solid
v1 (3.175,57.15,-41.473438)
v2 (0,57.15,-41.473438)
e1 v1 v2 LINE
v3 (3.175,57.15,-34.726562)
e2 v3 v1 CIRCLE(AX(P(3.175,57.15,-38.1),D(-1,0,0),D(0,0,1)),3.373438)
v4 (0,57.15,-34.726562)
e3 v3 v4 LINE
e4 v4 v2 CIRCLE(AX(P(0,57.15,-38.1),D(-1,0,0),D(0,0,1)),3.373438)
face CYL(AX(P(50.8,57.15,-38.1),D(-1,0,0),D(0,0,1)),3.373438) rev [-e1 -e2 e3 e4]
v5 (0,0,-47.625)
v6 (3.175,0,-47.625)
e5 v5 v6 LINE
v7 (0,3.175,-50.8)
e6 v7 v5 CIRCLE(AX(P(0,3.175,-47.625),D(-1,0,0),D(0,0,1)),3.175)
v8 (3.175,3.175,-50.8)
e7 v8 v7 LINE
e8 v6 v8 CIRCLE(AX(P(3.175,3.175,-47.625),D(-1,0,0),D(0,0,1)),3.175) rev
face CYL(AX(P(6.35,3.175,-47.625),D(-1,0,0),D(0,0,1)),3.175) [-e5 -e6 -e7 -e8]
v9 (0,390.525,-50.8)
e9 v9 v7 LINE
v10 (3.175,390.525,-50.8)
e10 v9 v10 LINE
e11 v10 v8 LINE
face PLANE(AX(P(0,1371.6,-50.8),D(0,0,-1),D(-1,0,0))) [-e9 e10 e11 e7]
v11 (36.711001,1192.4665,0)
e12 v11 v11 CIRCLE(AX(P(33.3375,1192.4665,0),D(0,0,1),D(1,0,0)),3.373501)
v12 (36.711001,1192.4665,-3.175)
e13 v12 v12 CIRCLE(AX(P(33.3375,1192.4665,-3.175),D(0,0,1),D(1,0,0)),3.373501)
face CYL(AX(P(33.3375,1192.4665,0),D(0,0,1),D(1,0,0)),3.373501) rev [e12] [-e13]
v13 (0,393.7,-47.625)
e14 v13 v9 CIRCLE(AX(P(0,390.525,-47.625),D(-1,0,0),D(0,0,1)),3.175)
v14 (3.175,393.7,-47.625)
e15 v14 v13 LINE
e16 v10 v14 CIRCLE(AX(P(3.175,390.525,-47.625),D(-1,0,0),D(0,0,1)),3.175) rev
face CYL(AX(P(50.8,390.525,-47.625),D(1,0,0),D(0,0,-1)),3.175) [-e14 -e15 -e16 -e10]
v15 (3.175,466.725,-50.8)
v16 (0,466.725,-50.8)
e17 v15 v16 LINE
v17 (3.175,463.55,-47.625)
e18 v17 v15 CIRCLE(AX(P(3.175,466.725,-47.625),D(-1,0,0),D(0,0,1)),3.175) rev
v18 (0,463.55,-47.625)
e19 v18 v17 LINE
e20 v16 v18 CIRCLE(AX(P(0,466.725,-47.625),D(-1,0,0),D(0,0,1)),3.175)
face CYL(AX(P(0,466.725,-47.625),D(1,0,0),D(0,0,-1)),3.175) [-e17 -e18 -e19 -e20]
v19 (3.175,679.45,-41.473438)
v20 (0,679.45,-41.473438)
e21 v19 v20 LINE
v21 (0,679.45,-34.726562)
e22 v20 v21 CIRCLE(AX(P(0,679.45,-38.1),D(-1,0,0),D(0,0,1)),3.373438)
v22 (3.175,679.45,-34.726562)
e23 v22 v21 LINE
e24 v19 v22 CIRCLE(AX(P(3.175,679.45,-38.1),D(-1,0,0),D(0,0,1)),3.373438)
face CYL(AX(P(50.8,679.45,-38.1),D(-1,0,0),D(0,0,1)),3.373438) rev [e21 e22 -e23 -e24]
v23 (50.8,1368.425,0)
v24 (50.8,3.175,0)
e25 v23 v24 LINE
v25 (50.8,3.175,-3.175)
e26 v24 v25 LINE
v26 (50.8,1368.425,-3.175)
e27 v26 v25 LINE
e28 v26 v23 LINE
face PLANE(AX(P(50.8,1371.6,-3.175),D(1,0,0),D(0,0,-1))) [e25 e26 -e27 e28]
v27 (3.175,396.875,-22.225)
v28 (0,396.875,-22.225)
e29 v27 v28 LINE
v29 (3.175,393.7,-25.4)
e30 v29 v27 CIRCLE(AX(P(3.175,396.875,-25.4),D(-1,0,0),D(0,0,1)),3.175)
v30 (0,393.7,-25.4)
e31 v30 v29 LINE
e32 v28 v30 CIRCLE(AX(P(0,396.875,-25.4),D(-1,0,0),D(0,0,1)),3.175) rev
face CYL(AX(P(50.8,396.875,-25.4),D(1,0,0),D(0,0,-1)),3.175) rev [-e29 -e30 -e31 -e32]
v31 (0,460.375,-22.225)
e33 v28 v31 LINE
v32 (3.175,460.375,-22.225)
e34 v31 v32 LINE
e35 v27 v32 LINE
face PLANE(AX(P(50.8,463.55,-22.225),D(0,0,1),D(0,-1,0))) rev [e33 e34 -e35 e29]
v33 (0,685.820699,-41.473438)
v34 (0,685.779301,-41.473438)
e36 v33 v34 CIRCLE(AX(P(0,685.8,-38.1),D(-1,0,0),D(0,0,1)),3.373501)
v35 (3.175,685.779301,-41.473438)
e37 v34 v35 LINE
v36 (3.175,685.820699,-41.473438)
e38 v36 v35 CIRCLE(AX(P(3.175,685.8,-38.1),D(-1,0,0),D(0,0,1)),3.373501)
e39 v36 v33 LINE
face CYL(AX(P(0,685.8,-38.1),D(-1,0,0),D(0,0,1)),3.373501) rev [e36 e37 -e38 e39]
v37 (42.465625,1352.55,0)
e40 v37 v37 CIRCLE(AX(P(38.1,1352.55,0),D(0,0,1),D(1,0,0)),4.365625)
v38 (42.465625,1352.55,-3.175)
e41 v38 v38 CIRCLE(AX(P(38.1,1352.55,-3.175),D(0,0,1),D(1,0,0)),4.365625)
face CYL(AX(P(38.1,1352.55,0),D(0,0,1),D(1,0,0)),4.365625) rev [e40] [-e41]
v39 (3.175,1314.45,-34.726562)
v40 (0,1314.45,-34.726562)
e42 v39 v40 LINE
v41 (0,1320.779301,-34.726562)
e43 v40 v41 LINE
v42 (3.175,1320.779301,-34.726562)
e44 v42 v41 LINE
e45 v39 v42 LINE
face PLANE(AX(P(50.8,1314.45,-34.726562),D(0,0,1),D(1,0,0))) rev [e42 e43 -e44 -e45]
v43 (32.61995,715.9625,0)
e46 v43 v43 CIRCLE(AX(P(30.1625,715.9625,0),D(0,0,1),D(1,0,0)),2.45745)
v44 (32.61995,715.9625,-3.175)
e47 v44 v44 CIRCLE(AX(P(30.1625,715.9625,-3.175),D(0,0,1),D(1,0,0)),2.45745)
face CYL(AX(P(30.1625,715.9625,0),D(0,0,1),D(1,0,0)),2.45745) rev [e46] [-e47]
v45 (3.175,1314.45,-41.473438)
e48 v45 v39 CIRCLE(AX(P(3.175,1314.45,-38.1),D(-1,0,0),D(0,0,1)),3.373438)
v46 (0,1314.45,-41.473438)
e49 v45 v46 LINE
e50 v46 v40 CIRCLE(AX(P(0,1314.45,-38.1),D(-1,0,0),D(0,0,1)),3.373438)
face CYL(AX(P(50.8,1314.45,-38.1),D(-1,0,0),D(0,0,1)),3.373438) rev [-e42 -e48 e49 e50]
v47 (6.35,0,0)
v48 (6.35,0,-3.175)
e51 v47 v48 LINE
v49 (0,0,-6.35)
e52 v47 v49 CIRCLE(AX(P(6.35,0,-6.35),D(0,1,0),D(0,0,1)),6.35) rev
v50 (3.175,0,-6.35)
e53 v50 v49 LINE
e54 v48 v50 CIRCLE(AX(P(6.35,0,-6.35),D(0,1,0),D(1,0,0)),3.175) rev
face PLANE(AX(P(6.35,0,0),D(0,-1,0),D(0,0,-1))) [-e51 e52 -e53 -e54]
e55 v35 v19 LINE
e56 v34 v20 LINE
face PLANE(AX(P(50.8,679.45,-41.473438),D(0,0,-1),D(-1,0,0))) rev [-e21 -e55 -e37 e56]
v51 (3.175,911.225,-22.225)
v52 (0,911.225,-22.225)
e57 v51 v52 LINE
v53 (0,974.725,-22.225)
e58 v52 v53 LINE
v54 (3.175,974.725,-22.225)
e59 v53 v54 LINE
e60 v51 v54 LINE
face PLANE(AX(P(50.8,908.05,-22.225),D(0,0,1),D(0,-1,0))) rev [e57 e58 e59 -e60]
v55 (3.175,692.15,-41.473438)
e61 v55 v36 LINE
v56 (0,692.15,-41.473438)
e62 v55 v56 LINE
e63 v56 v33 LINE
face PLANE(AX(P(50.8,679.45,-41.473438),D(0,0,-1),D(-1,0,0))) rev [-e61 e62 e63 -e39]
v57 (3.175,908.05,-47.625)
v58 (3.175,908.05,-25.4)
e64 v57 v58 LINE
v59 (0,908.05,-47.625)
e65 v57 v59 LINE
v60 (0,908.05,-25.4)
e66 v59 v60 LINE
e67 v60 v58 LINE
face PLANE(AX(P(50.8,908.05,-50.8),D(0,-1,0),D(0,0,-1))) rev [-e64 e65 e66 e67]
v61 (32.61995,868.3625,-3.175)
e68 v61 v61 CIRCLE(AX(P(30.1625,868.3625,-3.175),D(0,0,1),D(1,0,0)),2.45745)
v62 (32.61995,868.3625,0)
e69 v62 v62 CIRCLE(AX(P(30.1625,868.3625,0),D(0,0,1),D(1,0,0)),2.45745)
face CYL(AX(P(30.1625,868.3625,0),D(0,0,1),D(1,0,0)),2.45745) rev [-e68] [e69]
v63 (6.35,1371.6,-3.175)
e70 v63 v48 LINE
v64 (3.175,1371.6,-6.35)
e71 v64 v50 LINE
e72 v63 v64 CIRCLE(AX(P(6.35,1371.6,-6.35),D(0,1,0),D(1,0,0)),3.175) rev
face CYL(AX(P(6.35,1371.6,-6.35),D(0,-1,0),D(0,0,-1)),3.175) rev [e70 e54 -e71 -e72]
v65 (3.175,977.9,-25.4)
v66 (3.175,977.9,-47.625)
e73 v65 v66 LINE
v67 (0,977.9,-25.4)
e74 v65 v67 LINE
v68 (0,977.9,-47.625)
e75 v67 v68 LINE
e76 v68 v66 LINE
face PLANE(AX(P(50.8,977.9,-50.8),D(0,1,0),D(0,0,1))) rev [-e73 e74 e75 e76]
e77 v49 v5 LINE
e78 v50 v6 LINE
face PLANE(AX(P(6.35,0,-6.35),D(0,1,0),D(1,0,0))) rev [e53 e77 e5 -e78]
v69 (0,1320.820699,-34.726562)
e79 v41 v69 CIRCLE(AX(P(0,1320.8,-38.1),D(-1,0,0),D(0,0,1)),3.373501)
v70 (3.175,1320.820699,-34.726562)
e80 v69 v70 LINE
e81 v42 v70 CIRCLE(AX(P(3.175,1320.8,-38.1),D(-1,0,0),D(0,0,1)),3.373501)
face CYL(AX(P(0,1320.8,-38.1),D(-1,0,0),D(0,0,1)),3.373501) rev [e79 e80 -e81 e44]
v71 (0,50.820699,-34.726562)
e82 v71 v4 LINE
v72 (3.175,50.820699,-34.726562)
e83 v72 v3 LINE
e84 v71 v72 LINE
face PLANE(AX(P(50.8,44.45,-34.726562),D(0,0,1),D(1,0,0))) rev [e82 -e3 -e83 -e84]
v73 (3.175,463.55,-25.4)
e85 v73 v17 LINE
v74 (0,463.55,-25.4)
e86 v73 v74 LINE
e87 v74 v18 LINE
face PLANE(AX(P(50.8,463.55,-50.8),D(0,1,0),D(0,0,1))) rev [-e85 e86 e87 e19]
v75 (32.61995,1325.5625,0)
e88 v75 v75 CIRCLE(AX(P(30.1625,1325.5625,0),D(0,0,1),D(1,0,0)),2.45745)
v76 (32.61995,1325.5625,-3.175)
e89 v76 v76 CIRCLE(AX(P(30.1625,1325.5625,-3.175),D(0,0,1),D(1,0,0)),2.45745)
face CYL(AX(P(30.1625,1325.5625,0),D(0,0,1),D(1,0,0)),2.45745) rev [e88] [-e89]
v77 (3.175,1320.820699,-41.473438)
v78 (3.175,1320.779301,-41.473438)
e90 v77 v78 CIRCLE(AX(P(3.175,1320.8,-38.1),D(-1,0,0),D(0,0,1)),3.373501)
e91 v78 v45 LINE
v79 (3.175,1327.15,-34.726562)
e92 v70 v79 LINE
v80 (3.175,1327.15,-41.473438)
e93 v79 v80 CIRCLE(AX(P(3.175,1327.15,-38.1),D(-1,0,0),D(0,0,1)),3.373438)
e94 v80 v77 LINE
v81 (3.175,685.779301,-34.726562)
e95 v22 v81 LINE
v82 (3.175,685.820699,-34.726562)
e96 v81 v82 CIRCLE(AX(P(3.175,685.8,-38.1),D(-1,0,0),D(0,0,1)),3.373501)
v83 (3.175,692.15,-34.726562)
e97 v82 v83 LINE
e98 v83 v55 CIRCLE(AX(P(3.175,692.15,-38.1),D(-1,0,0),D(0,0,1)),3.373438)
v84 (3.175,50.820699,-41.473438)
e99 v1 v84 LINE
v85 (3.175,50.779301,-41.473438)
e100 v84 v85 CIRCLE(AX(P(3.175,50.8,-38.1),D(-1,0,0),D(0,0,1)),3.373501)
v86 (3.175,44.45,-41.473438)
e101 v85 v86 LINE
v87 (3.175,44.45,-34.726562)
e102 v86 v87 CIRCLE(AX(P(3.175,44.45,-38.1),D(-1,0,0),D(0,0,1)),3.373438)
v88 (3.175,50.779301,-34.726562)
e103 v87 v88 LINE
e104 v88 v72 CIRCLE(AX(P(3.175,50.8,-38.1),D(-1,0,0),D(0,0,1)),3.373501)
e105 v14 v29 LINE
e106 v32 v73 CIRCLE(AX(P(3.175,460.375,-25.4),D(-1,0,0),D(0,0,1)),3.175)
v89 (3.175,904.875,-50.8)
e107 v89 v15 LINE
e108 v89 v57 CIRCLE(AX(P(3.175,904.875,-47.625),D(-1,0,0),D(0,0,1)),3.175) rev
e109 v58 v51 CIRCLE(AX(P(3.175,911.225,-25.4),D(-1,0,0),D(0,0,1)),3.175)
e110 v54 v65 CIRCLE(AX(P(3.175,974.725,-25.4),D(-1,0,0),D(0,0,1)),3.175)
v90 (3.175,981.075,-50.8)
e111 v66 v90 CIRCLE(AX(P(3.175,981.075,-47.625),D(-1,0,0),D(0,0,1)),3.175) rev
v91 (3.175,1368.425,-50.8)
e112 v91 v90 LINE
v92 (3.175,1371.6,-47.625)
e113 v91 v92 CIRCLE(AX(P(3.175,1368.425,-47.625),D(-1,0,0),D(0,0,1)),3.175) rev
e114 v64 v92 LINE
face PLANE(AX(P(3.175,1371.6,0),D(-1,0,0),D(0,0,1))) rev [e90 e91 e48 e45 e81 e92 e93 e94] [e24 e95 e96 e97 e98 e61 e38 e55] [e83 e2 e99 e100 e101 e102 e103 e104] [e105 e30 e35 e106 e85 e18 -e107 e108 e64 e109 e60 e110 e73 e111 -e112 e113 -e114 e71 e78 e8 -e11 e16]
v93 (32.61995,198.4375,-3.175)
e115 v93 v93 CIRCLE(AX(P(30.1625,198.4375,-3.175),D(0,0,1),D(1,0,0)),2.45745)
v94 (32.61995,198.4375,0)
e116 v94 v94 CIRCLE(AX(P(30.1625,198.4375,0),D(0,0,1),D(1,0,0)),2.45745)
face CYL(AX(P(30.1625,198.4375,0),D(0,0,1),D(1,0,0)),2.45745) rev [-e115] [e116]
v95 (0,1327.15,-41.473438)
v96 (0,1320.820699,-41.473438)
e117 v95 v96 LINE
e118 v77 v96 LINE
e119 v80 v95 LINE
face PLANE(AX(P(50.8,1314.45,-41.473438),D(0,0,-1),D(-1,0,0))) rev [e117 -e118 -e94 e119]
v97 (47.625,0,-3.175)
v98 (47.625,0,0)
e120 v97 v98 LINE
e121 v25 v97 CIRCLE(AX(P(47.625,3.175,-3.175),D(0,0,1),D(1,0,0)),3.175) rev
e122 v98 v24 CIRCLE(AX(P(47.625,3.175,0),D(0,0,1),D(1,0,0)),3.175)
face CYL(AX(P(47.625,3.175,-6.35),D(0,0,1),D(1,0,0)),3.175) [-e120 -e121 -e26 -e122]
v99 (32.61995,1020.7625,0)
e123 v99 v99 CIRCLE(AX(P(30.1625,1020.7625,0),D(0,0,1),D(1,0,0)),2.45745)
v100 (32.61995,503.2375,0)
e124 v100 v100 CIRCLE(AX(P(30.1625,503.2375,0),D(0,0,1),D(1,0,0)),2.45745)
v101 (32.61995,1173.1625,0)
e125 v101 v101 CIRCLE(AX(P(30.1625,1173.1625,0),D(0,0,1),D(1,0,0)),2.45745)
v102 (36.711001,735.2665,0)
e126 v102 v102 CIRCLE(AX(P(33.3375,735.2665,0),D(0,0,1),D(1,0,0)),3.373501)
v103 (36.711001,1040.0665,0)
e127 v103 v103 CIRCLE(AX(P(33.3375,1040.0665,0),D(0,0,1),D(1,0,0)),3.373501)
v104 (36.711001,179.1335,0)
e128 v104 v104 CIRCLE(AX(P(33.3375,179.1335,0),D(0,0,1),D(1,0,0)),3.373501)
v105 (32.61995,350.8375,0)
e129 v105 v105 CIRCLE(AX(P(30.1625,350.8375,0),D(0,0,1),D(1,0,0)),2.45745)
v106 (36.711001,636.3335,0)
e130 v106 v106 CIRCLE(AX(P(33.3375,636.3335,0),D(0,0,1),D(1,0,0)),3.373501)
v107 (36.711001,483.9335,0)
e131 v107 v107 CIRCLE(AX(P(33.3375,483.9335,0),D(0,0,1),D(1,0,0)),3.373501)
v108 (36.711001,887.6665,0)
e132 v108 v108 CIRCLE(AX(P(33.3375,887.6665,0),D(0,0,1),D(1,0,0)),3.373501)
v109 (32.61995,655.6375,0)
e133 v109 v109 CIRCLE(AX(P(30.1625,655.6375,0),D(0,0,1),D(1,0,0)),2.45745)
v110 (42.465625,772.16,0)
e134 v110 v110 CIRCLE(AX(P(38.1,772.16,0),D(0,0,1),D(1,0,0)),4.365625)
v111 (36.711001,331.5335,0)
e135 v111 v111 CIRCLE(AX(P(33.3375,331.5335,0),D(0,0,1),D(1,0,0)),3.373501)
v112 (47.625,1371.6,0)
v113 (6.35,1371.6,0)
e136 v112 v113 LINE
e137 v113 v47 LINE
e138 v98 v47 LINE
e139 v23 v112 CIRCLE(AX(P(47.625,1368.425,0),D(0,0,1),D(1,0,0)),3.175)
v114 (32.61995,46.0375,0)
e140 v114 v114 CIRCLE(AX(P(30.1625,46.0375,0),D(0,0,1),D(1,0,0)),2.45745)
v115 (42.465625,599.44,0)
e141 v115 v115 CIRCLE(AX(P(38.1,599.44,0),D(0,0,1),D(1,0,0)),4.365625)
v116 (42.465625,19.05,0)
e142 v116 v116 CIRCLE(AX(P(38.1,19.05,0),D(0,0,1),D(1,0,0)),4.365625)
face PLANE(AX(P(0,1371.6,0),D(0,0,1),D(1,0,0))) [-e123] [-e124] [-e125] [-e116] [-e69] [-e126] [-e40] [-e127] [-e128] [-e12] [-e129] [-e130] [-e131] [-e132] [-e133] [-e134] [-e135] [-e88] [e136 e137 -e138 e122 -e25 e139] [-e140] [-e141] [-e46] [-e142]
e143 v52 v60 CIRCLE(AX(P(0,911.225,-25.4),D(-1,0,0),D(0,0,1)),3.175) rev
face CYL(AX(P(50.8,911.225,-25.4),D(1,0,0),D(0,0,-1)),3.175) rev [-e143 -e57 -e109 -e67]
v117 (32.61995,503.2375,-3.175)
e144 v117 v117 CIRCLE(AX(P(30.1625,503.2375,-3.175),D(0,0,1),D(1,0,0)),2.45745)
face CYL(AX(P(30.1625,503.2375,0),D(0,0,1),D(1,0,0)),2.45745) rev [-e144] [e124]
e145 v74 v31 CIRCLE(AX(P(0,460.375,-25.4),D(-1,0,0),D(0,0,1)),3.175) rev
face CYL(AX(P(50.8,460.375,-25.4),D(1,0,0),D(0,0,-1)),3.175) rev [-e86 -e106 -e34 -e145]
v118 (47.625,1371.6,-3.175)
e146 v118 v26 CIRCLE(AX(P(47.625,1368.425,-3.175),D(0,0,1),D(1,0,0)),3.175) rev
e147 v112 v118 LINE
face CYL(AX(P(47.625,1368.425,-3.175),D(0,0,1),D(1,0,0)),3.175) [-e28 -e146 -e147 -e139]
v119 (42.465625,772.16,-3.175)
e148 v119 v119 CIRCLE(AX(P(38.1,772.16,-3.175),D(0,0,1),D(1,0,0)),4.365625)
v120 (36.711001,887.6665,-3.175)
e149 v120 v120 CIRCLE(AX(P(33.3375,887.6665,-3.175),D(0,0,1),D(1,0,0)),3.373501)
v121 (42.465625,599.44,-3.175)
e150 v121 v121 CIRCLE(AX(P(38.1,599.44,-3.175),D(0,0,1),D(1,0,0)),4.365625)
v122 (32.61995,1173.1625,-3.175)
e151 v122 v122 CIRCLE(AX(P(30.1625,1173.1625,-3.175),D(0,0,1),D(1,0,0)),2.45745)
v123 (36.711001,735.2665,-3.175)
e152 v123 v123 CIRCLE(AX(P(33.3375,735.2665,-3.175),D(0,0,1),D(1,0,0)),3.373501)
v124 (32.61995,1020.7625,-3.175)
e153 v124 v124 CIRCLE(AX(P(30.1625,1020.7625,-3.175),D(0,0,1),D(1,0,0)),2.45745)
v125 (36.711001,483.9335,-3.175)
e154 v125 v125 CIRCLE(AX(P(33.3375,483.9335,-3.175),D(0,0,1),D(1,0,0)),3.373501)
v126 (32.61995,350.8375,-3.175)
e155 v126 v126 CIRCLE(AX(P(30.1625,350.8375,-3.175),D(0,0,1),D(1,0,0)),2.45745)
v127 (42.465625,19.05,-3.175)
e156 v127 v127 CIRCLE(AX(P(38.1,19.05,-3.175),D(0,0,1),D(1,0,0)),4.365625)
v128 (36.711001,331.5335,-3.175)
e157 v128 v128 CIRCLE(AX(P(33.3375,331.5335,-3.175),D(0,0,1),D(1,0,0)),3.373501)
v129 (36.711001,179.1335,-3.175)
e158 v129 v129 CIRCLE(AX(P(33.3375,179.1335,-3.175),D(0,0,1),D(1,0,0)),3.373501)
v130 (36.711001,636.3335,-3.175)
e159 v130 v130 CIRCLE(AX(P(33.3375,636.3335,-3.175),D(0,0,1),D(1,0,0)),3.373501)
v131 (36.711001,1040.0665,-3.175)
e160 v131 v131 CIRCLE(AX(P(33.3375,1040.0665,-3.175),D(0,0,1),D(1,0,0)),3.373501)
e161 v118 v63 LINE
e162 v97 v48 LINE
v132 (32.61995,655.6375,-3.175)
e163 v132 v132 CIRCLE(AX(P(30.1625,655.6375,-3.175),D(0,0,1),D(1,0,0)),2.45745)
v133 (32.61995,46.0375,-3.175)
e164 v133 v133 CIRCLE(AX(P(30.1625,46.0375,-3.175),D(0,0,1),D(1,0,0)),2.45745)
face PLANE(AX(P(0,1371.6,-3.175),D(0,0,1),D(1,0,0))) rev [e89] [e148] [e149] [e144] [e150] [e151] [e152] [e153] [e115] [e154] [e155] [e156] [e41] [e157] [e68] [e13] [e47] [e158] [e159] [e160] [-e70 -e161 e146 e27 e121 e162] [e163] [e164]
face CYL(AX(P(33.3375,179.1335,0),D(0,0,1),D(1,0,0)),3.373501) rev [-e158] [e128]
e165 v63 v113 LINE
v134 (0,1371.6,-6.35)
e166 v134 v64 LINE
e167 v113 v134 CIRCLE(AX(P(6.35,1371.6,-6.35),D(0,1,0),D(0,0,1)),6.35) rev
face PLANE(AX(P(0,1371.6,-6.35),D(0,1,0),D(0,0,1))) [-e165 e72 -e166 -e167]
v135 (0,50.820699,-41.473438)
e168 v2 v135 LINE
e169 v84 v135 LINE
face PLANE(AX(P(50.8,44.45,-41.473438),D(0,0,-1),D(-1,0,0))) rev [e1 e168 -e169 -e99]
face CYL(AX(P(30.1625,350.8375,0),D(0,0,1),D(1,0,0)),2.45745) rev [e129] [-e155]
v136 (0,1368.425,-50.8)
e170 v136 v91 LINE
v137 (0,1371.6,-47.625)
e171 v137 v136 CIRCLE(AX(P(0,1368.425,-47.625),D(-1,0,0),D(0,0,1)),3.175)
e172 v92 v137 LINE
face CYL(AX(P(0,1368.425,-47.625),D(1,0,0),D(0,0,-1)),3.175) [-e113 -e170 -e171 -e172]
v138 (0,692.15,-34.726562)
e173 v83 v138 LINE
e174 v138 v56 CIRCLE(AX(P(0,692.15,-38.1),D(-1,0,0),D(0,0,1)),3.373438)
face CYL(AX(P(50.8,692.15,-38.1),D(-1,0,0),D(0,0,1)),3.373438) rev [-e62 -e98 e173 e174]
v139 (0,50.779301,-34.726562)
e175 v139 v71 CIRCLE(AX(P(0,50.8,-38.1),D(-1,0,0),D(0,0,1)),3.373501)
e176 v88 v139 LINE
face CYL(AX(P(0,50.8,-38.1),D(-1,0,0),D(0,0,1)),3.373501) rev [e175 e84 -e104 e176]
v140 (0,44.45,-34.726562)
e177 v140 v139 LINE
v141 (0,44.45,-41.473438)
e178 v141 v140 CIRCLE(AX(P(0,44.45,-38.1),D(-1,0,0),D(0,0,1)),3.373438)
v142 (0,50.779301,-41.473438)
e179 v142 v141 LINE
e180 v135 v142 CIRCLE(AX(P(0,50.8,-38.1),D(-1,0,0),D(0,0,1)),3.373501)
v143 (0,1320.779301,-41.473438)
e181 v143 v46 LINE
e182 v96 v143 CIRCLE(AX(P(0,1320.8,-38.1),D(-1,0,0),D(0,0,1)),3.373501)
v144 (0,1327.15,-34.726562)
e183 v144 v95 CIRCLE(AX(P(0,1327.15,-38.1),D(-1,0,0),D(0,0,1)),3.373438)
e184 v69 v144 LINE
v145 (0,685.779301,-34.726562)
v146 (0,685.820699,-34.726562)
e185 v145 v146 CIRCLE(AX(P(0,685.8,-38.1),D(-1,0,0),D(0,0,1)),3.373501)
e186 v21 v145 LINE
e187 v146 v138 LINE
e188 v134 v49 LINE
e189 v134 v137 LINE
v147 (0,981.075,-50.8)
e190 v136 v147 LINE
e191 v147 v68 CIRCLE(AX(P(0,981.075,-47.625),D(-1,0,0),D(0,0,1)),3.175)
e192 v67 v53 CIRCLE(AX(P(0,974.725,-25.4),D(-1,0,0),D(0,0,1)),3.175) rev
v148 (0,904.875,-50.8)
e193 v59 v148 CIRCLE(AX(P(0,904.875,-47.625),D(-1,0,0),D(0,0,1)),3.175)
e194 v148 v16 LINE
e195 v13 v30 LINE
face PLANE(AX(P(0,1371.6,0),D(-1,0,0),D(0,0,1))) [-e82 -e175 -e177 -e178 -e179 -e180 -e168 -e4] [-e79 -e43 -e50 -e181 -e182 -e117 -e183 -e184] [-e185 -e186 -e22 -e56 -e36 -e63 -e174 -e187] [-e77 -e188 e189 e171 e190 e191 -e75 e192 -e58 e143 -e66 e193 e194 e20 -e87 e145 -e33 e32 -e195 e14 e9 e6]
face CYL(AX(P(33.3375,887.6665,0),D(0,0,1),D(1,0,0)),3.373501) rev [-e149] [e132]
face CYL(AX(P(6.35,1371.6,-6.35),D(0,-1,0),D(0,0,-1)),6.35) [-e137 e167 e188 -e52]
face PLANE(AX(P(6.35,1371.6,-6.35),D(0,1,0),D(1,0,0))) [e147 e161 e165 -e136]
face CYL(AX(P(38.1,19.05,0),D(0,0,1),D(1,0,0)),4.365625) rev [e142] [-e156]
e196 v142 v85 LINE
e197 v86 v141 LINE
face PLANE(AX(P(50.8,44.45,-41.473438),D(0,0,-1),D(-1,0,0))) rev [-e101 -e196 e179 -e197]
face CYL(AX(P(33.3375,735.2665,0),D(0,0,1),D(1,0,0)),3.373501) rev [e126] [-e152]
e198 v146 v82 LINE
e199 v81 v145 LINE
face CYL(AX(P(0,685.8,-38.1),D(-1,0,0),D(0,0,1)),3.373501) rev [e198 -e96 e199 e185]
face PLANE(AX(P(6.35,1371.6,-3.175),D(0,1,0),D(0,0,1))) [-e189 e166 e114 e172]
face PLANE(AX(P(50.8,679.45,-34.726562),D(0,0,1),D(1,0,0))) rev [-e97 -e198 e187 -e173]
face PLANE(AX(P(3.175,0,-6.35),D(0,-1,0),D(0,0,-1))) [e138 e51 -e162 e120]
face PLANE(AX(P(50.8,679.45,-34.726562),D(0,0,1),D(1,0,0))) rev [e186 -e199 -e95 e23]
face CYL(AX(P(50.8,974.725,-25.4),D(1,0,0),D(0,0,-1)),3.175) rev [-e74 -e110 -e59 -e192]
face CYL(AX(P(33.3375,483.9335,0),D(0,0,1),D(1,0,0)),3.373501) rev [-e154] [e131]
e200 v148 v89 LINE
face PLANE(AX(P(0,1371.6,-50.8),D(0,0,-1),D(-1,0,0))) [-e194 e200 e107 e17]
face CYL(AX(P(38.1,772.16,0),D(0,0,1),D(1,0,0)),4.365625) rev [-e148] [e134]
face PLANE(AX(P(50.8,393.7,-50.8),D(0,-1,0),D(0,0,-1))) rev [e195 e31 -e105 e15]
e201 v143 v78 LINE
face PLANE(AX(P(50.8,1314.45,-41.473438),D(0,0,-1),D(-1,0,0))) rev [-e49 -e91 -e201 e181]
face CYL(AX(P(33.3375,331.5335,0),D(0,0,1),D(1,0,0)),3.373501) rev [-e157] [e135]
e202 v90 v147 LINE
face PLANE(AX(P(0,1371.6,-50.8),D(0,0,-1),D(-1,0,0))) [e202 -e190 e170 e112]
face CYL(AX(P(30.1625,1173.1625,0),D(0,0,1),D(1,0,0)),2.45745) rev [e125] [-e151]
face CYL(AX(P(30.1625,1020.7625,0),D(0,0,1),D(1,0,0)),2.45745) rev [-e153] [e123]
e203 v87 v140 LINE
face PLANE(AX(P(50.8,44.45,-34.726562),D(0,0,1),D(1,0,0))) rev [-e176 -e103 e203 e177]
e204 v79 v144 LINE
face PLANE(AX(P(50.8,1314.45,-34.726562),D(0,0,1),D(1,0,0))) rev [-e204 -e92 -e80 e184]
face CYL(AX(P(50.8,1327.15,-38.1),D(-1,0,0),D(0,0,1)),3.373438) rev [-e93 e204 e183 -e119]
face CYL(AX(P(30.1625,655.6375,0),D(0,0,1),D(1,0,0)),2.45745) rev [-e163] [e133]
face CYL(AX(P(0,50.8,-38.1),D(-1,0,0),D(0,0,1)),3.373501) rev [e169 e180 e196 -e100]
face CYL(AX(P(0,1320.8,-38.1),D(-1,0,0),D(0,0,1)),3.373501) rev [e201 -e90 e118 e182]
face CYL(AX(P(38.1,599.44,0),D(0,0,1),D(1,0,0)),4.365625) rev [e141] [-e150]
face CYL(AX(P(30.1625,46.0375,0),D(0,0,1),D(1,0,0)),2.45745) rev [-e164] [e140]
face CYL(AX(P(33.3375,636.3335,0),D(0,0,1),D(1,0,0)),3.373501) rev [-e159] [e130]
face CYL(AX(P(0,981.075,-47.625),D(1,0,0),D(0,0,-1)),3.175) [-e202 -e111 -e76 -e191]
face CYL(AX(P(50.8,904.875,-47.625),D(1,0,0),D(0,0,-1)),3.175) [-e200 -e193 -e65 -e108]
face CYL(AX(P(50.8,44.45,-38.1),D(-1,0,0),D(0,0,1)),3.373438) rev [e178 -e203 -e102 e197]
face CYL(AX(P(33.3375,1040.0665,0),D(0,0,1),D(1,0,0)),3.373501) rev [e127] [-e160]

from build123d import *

# Parameters (mm, degrees)
BASE_FLANGE1_DEPTH               = 1371.6
F_17_64_0_26563_DIAMETER_HOLE1_D = 6.747002
SKETCH8_W                        = 28.575
SKETCH8_H                        = 69.85
CUT_EXTRUDE1_DEPTH               = 1374.480192795
F_10_0_1935_DIAMETER_HOLE1_D     = 4.9149
F_17_64_0_26563_DIAMETER_HOLE2_D = 6.747002
F_11_32_0_34375_DIAMETER_HOLE1_D = 8.73125
FILLET1_R                        = 3.175
CUT_EXTRUDE2_DEPTH               = 1374.480192795


# Sheet-metal steps are written as plain solids
with BuildPart() as part:
    # Sketch1 → Base-Flange1 (new body)
    with BuildSketch(Plane(origin=(0, 0, 0), x_dir=(1, 0, 0), z_dir=(0, 1, 0))):
        with BuildLine():
            Line((0, 50.8), (0, 6.35))
            ThreePointArc((0, 6.35), (1.859871939, 1.859871939), (6.35, 0))
            Line((6.35, 0), (50.8, 0))
            Line((50.8, 0), (50.8, 3.175))
            Line((50.8, 3.175), (6.35, 3.175))
            ThreePointArc((6.35, 3.175), (4.10493597, 4.10493597), (3.175, 6.35))
            Line((3.175, 6.35), (3.175, 50.8))
            Line((3.175, 50.8), (0, 50.8))
        make_face()
    extrude(amount=BASE_FLANGE1_DEPTH)

    # 17/64 (0.26563) Diameter Hole1 (through all)
    with Locations(Plane.ZY):
        with Locations((-38.1, 50.8), (-38.1, 685.8), (-38.1, 1320.8)):
            Hole(F_17_64_0_26563_DIAMETER_HOLE1_D / 2)

    # Sketch8 → Cut-Extrude1 (cut, through all)
    with BuildSketch(Plane.ZY):
        with Locations((-36.5125, 428.625)):
            Rectangle(SKETCH8_W, SKETCH8_H)
        with Locations((-36.5125, 942.975)):
            Rectangle(SKETCH8_W, SKETCH8_H)
    extrude(amount=-CUT_EXTRUDE1_DEPTH, mode=Mode.SUBTRACT)

    # #10 (0.1935) Diameter Hole1 (through all)
    with Locations(Plane.XY):
        with Locations((30.1625, 46.0375), (30.1625, 198.4375), (30.1625, 350.8375), (30.1625, 503.2375), (30.1625, 655.6375)):
            f_10_0_1935_diameter_hole1 = Hole(F_10_0_1935_DIAMETER_HOLE1_D / 2)

    # 17/64 (0.26563) Diameter Hole2 (through all)
    with Locations(Plane.XY):
        with Locations((33.3375, 179.1335), (33.3375, 331.5335), (33.3375, 483.9335), (33.3375, 636.3335)):
            f_17_64_0_26563_diameter_hole2 = Hole(F_17_64_0_26563_DIAMETER_HOLE2_D / 2)

    # 11/32 (0.34375) Diameter Hole1 (through all)
    with Locations(Plane.XY):
        with Locations((38.1, 1352.55), (38.1, 772.16)):
            f_11_32_0_34375_diameter_hole1 = Hole(F_11_32_0_34375_DIAMETER_HOLE1_D / 2)

    # Fillet1
    fillet1_edges = [part.edges().sort_by_distance(p)[0] for p in [
        (50.8, 1371.6, -1.5875),
        (1.5875, 393.7, -50.8),
        (1.5875, 463.55, -50.8),
        (1.5875, 463.55, -22.225),
        (1.5875, 393.7, -22.225),
        (1.5875, 908.05, -22.225),
        (1.5875, 908.05, -50.8),
        (1.5875, 977.9, -50.8),
        (1.5875, 977.9, -22.225),
        (50.8, 0, -1.5875),
        (1.5875, 1371.6, -50.8),
        (1.5875, 0, -50.8),
    ]]
    fillet(fillet1_edges, radius=FILLET1_R)

    # Mirror1: #10 (0.1935) Diameter Hole1, 17/64 (0.26563) Diameter Hole2, 11/32 (0.34375) Diameter Hole1 across plane
    add(f_10_0_1935_diameter_hole1.mirror(Plane.ZX.offset(685.8)), mode=Mode.SUBTRACT)
    add(f_17_64_0_26563_diameter_hole2.mirror(Plane.ZX.offset(685.8)), mode=Mode.SUBTRACT)
    add(f_11_32_0_34375_diameter_hole1.mirror(Plane.ZX.offset(685.8)), mode=Mode.SUBTRACT)

    # Sketch15 → Cut-Extrude2 (cut, through all)
    with BuildSketch(Plane.ZY):
        with BuildLine():
            Line((-41.4734375, 1314.45), (-41.4734375, 1327.15))
            ThreePointArc((-41.4734375, 1327.15), (-38.1, 1330.5234375), (-34.7265625, 1327.15))
            Line((-34.7265625, 1327.15), (-34.7265625, 1314.45))
            ThreePointArc((-34.7265625, 1314.45), (-38.1, 1311.0765625), (-41.4734375, 1314.45))
        make_face()
        with BuildLine():
            Line((-41.4734375, 679.45), (-41.4734375, 692.15))
            ThreePointArc((-41.4734375, 692.15), (-38.1, 695.5234375), (-34.7265625, 692.15))
            Line((-34.7265625, 692.15), (-34.7265625, 679.45))
            ThreePointArc((-34.7265625, 679.45), (-38.1, 676.0765625), (-41.4734375, 679.45))
        make_face()
        with BuildLine():
            Line((-41.4734375, 44.45), (-41.4734375, 57.15))
            ThreePointArc((-41.4734375, 57.15), (-38.1, 60.5234375), (-34.7265625, 57.15))
            Line((-34.7265625, 57.15), (-34.7265625, 44.45))
            ThreePointArc((-34.7265625, 44.45), (-38.1, 41.0765625), (-41.4734375, 44.45))
        make_face()
    extrude(amount=-CUT_EXTRUDE2_DEPTH, mode=Mode.SUBTRACT)


solid = part.part
